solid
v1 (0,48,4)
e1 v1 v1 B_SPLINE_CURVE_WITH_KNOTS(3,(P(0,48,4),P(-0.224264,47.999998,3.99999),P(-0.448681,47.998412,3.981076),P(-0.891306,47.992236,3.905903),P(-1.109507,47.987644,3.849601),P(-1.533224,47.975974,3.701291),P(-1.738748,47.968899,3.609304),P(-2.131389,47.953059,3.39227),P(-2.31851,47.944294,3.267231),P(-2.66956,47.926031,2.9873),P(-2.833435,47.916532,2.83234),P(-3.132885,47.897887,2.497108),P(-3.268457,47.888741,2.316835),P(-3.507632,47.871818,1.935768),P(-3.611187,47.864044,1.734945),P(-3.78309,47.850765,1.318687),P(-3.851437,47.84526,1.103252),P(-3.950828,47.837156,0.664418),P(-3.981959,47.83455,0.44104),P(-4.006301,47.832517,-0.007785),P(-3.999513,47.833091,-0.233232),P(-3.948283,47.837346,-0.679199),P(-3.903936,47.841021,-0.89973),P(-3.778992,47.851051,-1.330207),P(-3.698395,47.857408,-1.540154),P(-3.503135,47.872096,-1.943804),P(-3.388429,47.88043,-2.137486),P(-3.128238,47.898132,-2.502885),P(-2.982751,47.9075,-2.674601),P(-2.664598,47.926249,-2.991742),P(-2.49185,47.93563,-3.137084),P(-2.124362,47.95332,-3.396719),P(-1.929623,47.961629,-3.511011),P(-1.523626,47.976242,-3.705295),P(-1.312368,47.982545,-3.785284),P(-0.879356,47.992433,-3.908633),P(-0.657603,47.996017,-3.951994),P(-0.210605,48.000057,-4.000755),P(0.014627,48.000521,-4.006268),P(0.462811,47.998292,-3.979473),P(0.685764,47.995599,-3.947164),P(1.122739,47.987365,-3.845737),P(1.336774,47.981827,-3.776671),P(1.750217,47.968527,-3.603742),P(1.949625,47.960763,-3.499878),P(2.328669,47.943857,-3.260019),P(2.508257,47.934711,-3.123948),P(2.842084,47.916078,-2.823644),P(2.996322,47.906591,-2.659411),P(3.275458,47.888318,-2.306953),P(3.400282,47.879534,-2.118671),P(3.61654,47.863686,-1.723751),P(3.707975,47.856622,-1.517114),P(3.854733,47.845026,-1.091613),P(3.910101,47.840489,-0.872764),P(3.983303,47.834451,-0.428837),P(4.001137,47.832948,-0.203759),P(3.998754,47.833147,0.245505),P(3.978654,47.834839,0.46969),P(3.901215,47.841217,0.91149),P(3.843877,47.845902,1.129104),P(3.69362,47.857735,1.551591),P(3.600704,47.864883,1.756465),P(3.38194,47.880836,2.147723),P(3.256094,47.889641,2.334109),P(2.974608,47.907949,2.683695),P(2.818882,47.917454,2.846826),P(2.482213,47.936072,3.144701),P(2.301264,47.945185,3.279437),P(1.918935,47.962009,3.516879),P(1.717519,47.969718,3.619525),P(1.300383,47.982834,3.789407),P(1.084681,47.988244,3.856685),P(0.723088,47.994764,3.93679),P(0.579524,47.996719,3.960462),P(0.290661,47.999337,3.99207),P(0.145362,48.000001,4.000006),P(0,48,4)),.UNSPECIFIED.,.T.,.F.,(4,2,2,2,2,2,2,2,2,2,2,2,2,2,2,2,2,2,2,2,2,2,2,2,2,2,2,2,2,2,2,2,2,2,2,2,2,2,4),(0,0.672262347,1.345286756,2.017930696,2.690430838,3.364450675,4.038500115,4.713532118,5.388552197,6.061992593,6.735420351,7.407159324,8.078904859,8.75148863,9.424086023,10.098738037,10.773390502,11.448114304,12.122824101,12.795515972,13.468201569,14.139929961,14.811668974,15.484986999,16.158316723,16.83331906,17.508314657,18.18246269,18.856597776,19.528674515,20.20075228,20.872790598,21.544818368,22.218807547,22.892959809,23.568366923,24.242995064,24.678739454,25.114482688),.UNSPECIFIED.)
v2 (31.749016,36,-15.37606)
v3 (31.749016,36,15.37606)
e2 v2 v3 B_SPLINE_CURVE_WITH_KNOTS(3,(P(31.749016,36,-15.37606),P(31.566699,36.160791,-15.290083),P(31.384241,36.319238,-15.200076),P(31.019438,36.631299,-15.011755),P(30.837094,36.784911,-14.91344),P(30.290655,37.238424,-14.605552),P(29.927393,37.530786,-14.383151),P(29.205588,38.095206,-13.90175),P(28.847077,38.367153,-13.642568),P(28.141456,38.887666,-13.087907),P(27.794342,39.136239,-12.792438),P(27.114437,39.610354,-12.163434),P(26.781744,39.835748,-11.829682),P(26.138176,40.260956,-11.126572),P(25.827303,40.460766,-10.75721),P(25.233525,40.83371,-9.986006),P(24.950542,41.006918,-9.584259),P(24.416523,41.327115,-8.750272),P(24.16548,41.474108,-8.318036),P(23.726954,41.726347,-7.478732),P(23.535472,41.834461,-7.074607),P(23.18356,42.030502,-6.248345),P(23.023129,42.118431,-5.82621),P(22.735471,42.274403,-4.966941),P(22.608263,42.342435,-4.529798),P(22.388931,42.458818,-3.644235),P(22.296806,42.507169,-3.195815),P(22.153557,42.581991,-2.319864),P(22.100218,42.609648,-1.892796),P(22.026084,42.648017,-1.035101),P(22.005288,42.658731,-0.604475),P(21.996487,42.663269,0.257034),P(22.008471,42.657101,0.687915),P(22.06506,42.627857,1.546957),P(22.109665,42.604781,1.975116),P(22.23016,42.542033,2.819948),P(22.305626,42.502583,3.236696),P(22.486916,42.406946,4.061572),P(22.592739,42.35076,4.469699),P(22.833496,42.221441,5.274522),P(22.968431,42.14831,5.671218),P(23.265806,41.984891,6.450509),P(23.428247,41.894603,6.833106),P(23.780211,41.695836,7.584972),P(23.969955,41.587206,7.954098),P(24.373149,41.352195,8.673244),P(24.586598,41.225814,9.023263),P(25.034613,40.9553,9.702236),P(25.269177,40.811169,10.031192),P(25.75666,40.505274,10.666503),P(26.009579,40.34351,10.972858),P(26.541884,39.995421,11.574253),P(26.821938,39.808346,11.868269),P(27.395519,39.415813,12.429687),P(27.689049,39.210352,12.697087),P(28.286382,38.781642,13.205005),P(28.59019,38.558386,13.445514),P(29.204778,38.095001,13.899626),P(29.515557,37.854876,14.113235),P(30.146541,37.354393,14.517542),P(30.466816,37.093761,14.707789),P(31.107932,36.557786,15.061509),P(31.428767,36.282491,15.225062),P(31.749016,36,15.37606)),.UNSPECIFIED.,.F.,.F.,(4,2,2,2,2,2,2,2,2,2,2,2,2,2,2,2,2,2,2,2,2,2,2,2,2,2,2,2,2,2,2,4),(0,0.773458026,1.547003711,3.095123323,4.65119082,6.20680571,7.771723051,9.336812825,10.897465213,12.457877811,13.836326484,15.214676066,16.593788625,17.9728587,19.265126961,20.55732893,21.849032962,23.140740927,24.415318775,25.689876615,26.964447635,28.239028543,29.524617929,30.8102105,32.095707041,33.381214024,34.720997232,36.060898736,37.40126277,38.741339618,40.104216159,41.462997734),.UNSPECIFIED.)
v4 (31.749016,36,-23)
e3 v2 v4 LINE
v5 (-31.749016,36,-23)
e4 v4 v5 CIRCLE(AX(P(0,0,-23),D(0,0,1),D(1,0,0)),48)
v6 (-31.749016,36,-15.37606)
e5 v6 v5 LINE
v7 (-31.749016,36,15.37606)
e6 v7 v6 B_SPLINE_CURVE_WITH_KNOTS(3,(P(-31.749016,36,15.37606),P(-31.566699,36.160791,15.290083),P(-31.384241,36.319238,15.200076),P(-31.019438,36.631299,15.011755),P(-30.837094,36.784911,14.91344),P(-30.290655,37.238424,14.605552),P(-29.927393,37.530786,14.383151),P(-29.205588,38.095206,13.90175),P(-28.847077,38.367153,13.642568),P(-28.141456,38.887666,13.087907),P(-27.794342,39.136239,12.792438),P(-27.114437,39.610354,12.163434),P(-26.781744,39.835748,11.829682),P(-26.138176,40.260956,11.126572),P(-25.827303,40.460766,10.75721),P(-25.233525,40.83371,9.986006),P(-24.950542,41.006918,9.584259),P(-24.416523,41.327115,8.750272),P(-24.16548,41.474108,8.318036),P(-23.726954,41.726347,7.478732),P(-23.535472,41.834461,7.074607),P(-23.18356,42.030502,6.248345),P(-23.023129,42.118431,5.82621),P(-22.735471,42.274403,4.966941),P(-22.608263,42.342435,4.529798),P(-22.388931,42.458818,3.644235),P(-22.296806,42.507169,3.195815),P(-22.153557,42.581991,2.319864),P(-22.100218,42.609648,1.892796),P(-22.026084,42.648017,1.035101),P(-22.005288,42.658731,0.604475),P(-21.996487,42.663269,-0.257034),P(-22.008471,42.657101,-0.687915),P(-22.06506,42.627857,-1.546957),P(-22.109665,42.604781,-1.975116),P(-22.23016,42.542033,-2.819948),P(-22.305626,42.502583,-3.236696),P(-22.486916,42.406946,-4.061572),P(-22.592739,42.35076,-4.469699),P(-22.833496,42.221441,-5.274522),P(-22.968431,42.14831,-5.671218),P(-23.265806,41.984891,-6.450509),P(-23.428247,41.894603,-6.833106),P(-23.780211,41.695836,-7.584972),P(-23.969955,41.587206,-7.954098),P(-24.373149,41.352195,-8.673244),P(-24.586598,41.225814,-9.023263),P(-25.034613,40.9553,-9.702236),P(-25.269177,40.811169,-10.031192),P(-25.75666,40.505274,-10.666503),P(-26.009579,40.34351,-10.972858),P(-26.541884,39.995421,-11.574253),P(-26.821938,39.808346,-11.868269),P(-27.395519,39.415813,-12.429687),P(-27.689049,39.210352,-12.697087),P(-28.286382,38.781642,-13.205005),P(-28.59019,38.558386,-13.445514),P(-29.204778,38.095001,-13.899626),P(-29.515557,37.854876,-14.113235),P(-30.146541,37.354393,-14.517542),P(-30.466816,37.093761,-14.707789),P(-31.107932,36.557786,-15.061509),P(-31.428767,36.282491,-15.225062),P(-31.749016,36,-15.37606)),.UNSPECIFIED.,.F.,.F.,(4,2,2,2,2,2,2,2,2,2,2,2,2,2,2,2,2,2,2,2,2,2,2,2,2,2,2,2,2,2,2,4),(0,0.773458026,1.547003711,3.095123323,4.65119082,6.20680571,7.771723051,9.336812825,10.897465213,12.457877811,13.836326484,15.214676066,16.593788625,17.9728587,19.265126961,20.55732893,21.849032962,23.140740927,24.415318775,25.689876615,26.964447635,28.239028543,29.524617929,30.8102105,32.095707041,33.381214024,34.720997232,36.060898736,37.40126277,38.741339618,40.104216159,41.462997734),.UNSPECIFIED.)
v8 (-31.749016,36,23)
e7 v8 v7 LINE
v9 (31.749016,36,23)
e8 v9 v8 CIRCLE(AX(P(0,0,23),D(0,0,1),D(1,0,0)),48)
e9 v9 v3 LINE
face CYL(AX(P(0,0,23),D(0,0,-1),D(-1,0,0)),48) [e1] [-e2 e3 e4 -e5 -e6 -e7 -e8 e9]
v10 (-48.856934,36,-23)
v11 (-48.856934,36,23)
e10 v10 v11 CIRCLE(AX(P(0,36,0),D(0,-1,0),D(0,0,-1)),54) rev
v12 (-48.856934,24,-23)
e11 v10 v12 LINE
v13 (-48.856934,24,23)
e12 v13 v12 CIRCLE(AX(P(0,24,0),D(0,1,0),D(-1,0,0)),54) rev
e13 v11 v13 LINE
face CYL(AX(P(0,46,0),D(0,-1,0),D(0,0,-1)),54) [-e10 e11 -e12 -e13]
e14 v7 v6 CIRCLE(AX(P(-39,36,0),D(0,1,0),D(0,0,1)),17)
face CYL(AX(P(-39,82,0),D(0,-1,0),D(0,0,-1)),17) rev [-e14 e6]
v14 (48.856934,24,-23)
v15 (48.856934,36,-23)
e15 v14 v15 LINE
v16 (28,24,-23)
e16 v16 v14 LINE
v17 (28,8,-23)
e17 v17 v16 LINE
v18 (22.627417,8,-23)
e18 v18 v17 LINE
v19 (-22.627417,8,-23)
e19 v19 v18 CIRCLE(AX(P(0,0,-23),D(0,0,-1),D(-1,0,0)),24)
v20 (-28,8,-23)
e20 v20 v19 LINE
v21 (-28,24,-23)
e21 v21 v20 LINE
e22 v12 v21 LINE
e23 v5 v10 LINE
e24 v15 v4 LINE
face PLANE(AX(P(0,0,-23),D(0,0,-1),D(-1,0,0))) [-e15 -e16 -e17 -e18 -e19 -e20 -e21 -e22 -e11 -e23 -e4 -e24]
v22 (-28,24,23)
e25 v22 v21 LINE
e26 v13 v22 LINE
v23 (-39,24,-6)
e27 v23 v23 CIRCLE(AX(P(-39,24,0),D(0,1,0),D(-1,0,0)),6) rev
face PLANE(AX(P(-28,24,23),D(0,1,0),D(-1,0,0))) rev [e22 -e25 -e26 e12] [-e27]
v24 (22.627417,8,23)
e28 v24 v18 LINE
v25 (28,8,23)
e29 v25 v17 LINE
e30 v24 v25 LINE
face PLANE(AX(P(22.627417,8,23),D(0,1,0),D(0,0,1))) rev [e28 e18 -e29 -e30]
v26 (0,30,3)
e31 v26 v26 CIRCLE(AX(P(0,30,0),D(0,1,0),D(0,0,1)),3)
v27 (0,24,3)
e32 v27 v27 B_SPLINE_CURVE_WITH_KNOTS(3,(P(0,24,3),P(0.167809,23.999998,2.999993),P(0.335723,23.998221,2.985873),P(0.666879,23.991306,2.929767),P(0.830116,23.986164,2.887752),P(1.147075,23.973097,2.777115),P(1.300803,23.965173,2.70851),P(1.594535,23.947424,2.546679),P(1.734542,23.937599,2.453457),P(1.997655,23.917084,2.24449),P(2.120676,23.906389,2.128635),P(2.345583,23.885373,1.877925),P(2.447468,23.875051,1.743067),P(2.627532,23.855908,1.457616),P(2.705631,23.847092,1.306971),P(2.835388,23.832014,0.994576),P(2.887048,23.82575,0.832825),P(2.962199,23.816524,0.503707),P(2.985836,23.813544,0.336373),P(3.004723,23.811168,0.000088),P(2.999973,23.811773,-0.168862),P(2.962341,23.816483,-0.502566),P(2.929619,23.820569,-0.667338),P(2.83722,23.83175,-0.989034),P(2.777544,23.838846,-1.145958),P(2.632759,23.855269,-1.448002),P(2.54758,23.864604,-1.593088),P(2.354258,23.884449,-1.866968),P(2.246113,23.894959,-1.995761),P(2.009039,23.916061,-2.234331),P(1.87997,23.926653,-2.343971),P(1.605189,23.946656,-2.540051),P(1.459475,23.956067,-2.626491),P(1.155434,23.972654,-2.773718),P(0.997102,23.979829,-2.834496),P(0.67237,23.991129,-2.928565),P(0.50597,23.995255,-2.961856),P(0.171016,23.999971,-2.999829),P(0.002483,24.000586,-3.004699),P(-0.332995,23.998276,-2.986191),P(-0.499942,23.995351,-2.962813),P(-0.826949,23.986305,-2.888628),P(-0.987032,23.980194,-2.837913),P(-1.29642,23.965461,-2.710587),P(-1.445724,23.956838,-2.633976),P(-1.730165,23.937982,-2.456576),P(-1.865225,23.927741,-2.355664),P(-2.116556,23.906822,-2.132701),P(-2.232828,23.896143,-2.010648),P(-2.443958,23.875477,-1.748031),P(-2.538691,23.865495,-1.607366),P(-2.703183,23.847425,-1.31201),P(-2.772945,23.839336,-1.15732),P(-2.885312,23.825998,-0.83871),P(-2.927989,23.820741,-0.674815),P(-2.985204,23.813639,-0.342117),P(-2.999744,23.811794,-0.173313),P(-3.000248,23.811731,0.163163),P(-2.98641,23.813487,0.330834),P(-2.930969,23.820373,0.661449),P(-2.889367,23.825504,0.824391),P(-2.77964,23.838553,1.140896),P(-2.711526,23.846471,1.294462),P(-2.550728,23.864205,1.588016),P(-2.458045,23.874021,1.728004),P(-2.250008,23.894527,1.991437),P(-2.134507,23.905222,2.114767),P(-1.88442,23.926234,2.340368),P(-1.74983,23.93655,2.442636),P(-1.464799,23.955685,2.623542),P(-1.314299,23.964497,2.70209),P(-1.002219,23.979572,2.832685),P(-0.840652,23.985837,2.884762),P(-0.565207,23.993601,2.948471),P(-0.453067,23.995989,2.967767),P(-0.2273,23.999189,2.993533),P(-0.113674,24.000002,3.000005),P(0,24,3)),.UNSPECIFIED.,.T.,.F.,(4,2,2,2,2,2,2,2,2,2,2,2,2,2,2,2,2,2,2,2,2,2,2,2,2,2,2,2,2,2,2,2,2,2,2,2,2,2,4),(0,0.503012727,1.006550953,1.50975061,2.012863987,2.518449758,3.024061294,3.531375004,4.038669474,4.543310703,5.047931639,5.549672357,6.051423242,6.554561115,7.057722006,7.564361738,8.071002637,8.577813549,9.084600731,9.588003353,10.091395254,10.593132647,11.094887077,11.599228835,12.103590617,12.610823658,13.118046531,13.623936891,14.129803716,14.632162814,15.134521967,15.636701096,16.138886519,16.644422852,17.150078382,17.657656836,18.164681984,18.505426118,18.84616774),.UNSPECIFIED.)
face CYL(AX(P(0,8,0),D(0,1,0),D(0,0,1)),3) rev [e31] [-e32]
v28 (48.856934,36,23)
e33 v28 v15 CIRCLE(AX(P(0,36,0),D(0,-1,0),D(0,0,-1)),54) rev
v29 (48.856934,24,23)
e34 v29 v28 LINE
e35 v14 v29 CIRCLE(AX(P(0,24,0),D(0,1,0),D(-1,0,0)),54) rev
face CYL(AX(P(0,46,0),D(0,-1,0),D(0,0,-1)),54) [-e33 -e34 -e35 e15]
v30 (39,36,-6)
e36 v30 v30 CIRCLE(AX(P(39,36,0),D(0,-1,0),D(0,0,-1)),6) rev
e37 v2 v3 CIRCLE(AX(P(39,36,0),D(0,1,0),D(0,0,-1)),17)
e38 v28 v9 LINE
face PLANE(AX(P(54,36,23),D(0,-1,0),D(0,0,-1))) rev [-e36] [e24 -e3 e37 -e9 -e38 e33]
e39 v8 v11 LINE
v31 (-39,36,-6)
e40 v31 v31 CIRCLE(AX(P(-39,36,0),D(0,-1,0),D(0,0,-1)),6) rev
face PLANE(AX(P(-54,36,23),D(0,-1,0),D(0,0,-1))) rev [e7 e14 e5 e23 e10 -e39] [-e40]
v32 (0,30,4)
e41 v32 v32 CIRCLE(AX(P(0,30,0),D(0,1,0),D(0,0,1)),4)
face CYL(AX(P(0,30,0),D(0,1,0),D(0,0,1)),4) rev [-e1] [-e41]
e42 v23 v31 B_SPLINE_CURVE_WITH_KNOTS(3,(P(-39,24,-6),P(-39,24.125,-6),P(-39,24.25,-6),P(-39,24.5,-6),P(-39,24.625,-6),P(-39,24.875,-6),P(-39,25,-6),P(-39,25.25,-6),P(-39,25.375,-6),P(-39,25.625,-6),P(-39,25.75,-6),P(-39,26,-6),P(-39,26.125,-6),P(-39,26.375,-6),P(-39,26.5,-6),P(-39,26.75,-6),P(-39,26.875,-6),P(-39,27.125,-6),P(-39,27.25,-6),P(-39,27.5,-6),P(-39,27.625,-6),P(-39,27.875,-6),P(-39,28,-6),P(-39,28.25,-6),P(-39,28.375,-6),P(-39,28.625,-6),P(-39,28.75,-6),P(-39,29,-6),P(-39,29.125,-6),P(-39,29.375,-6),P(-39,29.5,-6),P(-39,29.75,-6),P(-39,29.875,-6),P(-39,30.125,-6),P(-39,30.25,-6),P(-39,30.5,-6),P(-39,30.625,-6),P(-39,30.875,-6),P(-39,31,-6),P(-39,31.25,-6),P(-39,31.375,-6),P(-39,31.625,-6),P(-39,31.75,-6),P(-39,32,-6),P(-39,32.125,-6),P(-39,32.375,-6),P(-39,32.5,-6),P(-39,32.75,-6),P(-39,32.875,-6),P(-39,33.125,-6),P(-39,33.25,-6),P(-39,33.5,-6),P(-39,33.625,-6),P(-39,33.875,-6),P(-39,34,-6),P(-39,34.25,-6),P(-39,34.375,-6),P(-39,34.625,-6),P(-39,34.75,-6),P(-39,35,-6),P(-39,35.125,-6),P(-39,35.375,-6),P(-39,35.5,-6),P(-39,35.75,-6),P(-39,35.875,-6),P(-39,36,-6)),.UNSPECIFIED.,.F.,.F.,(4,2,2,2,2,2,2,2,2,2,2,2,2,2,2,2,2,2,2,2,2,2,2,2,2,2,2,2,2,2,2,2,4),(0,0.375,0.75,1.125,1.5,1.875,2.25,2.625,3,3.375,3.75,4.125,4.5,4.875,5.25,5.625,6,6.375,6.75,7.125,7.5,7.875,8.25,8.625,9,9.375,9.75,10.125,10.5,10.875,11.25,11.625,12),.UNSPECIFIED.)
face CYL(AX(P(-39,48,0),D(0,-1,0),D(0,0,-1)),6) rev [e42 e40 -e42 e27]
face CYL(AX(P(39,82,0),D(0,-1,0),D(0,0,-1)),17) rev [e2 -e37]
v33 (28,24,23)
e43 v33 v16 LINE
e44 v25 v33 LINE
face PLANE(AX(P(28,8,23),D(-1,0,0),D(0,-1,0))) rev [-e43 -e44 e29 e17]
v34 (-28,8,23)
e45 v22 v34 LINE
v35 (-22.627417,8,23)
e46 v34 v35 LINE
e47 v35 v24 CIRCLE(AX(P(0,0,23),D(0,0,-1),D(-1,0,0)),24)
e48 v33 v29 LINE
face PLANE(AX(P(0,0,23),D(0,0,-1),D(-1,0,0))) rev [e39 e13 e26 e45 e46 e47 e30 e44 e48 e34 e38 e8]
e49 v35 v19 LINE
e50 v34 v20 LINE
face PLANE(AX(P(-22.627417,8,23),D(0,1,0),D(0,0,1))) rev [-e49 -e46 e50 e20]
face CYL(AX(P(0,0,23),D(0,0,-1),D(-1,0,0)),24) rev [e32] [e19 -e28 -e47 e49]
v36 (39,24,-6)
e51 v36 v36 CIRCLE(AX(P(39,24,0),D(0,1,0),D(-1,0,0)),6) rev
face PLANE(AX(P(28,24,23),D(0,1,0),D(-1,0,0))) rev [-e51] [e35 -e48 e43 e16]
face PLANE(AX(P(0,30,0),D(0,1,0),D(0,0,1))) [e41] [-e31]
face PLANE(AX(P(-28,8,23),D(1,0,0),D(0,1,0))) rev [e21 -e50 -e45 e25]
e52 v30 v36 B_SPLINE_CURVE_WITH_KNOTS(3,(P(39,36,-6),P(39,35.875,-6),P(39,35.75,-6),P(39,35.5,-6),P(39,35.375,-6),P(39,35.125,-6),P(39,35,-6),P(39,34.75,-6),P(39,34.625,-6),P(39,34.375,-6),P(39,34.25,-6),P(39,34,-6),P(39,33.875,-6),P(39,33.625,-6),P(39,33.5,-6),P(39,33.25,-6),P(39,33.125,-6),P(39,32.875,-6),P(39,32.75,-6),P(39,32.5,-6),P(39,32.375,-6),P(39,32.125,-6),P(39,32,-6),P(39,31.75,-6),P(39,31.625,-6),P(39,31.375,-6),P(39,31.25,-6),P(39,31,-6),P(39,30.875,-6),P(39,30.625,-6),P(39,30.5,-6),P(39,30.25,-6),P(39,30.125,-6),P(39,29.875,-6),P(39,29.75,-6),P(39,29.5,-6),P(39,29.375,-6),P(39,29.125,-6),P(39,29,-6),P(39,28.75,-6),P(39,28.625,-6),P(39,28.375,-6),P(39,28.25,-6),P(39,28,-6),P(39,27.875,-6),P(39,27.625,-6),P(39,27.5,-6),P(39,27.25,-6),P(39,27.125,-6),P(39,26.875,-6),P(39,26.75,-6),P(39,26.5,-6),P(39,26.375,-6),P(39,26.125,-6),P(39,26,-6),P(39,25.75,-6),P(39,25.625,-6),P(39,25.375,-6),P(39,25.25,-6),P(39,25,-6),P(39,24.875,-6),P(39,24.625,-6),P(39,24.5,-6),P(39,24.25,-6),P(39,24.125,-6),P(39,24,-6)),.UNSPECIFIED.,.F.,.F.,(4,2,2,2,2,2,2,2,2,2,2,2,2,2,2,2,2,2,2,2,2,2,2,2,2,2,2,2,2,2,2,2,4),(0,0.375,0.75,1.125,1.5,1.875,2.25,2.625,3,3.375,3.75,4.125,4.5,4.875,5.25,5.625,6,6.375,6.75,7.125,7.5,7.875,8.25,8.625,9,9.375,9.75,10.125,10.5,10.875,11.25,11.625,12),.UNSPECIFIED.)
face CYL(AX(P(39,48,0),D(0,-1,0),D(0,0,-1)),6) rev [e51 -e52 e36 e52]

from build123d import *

# Parameters (mm, degrees)
BOSS_EXTRUDE1_DEPTH = 23
CUT_EXTRUDE1_START  = 24
CUT_EXTRUDE1_DEPTH  = 12
SKETCH5_R           = 6
CUT_EXTRUDE2_DEPTH  = 76.822160349
SKETCH6_R           = 17
CUT_EXTRUDE3_DEPTH  = 46
SKETCH10_R          = 4
CUT_EXTRUDE6_DEPTH  = 20
SKETCH11_R          = 3
CUT_EXTRUDE7_DEPTH  = 63.681735814


# Read off the part's stored shape, not the designer's step: Cut-Extrude1
with BuildPart() as part:
    # Sketch1 → Boss-Extrude1 (new, symmetric)
    with BuildSketch(Plane.XY):
        with BuildLine():
            Line((-22.627416998, 8), (-28, 8))
            Line((-28, 8), (-28, 24))
            Line((-28, 24), (-54, 24))
            Line((-54, 24), (-54, 36))
            Line((-54, 36), (-31.749015733, 36))
            ThreePointArc((-31.749015733, 36), (0, 48), (31.749015733, 36))
            Line((31.749015733, 36), (54, 36))
            Line((54, 36), (54, 24))
            Line((54, 24), (28, 24))
            Line((28, 24), (28, 8))
            Line((28, 8), (22.627416998, 8))
            ThreePointArc((22.627416998, 8), (0, 24), (-22.627416998, 8))
        make_face()
    extrude(amount=BOSS_EXTRUDE1_DEPTH, both=True)

    # Cut-Extrude1 outline → Cut-Extrude1 (cut)
    with BuildSketch(Plane(origin=(0, 0, 0), x_dir=(1, 0, 0), z_dir=(0, 1, 0)).offset(CUT_EXTRUDE1_START)):
        with BuildLine():
            Line((-54, -23), (-48.856934001, -23))
            ThreePointArc((-48.856934001, -23), (-52.698550436, -11.784005345), (-54, 0))
            Line((-54, 0), (-54, -23))
        make_face()
        with BuildLine():
            Line((-54, 23), (-54, 0))
            ThreePointArc((-54, 0), (-52.698550436, 11.784005345), (-48.856934001, 23))
            Line((-48.856934001, 23), (-54, 23))
        make_face()
        with BuildLine():
            ThreePointArc((54, 0), (52.698550436, -11.784005345), (48.856934001, -23))
            Line((48.856934001, -23), (54, -23))
            Line((54, -23), (54, 0))
        make_face()
        with BuildLine():
            ThreePointArc((48.856934001, 23), (52.698550436, 11.784005345), (54, 0))
            Line((54, 0), (54, 23))
            Line((54, 23), (48.856934001, 23))
        make_face()
    extrude(amount=CUT_EXTRUDE1_DEPTH, mode=Mode.SUBTRACT)

    # Sketch5 → Cut-Extrude2 (cut, through all)
    with BuildSketch(Plane(origin=(0, 0, 0), x_dir=(1, 0, 0), z_dir=(0, 1, 0))):
        with Locations(Location((-39, 0, 0), (0, 0, 90))):
            Circle(SKETCH5_R)
        with Locations(Location((39, 0, 0), (0, 0, 90))):
            Circle(SKETCH5_R)
    extrude(amount=CUT_EXTRUDE2_DEPTH, mode=Mode.SUBTRACT)

    # Sketch6 → Cut-Extrude3 (cut)
    with BuildSketch(Plane(origin=(0, 36, 0), x_dir=(1, 0, 0), z_dir=(0, 1, 0))):
        with Locations((-39, 0)):
            Circle(SKETCH6_R)
        with Locations((39, 0)):
            Circle(SKETCH6_R)
    extrude(amount=CUT_EXTRUDE3_DEPTH, mode=Mode.SUBTRACT)

    # Sketch10 → Cut-Extrude6 (cut)
    with BuildSketch(Plane(origin=(0, 50, 0), x_dir=(1, 0, 0), z_dir=(0, 1, 0))):
        with Locations(Location((0, 0, 0), (0, 0, 270))):
            Circle(SKETCH10_R)
    extrude(amount=-CUT_EXTRUDE6_DEPTH, mode=Mode.SUBTRACT)

    # Sketch11 → Cut-Extrude7 (cut, through all)
    with BuildSketch(Plane(origin=(0, 30, 0), x_dir=(1, 0, 0), z_dir=(0, 1, 0))):
        with Locations(Location((0, 0, 0), (0, 0, 270))):
            Circle(SKETCH11_R)
    extrude(amount=-CUT_EXTRUDE7_DEPTH, mode=Mode.SUBTRACT)


solid = part.part
